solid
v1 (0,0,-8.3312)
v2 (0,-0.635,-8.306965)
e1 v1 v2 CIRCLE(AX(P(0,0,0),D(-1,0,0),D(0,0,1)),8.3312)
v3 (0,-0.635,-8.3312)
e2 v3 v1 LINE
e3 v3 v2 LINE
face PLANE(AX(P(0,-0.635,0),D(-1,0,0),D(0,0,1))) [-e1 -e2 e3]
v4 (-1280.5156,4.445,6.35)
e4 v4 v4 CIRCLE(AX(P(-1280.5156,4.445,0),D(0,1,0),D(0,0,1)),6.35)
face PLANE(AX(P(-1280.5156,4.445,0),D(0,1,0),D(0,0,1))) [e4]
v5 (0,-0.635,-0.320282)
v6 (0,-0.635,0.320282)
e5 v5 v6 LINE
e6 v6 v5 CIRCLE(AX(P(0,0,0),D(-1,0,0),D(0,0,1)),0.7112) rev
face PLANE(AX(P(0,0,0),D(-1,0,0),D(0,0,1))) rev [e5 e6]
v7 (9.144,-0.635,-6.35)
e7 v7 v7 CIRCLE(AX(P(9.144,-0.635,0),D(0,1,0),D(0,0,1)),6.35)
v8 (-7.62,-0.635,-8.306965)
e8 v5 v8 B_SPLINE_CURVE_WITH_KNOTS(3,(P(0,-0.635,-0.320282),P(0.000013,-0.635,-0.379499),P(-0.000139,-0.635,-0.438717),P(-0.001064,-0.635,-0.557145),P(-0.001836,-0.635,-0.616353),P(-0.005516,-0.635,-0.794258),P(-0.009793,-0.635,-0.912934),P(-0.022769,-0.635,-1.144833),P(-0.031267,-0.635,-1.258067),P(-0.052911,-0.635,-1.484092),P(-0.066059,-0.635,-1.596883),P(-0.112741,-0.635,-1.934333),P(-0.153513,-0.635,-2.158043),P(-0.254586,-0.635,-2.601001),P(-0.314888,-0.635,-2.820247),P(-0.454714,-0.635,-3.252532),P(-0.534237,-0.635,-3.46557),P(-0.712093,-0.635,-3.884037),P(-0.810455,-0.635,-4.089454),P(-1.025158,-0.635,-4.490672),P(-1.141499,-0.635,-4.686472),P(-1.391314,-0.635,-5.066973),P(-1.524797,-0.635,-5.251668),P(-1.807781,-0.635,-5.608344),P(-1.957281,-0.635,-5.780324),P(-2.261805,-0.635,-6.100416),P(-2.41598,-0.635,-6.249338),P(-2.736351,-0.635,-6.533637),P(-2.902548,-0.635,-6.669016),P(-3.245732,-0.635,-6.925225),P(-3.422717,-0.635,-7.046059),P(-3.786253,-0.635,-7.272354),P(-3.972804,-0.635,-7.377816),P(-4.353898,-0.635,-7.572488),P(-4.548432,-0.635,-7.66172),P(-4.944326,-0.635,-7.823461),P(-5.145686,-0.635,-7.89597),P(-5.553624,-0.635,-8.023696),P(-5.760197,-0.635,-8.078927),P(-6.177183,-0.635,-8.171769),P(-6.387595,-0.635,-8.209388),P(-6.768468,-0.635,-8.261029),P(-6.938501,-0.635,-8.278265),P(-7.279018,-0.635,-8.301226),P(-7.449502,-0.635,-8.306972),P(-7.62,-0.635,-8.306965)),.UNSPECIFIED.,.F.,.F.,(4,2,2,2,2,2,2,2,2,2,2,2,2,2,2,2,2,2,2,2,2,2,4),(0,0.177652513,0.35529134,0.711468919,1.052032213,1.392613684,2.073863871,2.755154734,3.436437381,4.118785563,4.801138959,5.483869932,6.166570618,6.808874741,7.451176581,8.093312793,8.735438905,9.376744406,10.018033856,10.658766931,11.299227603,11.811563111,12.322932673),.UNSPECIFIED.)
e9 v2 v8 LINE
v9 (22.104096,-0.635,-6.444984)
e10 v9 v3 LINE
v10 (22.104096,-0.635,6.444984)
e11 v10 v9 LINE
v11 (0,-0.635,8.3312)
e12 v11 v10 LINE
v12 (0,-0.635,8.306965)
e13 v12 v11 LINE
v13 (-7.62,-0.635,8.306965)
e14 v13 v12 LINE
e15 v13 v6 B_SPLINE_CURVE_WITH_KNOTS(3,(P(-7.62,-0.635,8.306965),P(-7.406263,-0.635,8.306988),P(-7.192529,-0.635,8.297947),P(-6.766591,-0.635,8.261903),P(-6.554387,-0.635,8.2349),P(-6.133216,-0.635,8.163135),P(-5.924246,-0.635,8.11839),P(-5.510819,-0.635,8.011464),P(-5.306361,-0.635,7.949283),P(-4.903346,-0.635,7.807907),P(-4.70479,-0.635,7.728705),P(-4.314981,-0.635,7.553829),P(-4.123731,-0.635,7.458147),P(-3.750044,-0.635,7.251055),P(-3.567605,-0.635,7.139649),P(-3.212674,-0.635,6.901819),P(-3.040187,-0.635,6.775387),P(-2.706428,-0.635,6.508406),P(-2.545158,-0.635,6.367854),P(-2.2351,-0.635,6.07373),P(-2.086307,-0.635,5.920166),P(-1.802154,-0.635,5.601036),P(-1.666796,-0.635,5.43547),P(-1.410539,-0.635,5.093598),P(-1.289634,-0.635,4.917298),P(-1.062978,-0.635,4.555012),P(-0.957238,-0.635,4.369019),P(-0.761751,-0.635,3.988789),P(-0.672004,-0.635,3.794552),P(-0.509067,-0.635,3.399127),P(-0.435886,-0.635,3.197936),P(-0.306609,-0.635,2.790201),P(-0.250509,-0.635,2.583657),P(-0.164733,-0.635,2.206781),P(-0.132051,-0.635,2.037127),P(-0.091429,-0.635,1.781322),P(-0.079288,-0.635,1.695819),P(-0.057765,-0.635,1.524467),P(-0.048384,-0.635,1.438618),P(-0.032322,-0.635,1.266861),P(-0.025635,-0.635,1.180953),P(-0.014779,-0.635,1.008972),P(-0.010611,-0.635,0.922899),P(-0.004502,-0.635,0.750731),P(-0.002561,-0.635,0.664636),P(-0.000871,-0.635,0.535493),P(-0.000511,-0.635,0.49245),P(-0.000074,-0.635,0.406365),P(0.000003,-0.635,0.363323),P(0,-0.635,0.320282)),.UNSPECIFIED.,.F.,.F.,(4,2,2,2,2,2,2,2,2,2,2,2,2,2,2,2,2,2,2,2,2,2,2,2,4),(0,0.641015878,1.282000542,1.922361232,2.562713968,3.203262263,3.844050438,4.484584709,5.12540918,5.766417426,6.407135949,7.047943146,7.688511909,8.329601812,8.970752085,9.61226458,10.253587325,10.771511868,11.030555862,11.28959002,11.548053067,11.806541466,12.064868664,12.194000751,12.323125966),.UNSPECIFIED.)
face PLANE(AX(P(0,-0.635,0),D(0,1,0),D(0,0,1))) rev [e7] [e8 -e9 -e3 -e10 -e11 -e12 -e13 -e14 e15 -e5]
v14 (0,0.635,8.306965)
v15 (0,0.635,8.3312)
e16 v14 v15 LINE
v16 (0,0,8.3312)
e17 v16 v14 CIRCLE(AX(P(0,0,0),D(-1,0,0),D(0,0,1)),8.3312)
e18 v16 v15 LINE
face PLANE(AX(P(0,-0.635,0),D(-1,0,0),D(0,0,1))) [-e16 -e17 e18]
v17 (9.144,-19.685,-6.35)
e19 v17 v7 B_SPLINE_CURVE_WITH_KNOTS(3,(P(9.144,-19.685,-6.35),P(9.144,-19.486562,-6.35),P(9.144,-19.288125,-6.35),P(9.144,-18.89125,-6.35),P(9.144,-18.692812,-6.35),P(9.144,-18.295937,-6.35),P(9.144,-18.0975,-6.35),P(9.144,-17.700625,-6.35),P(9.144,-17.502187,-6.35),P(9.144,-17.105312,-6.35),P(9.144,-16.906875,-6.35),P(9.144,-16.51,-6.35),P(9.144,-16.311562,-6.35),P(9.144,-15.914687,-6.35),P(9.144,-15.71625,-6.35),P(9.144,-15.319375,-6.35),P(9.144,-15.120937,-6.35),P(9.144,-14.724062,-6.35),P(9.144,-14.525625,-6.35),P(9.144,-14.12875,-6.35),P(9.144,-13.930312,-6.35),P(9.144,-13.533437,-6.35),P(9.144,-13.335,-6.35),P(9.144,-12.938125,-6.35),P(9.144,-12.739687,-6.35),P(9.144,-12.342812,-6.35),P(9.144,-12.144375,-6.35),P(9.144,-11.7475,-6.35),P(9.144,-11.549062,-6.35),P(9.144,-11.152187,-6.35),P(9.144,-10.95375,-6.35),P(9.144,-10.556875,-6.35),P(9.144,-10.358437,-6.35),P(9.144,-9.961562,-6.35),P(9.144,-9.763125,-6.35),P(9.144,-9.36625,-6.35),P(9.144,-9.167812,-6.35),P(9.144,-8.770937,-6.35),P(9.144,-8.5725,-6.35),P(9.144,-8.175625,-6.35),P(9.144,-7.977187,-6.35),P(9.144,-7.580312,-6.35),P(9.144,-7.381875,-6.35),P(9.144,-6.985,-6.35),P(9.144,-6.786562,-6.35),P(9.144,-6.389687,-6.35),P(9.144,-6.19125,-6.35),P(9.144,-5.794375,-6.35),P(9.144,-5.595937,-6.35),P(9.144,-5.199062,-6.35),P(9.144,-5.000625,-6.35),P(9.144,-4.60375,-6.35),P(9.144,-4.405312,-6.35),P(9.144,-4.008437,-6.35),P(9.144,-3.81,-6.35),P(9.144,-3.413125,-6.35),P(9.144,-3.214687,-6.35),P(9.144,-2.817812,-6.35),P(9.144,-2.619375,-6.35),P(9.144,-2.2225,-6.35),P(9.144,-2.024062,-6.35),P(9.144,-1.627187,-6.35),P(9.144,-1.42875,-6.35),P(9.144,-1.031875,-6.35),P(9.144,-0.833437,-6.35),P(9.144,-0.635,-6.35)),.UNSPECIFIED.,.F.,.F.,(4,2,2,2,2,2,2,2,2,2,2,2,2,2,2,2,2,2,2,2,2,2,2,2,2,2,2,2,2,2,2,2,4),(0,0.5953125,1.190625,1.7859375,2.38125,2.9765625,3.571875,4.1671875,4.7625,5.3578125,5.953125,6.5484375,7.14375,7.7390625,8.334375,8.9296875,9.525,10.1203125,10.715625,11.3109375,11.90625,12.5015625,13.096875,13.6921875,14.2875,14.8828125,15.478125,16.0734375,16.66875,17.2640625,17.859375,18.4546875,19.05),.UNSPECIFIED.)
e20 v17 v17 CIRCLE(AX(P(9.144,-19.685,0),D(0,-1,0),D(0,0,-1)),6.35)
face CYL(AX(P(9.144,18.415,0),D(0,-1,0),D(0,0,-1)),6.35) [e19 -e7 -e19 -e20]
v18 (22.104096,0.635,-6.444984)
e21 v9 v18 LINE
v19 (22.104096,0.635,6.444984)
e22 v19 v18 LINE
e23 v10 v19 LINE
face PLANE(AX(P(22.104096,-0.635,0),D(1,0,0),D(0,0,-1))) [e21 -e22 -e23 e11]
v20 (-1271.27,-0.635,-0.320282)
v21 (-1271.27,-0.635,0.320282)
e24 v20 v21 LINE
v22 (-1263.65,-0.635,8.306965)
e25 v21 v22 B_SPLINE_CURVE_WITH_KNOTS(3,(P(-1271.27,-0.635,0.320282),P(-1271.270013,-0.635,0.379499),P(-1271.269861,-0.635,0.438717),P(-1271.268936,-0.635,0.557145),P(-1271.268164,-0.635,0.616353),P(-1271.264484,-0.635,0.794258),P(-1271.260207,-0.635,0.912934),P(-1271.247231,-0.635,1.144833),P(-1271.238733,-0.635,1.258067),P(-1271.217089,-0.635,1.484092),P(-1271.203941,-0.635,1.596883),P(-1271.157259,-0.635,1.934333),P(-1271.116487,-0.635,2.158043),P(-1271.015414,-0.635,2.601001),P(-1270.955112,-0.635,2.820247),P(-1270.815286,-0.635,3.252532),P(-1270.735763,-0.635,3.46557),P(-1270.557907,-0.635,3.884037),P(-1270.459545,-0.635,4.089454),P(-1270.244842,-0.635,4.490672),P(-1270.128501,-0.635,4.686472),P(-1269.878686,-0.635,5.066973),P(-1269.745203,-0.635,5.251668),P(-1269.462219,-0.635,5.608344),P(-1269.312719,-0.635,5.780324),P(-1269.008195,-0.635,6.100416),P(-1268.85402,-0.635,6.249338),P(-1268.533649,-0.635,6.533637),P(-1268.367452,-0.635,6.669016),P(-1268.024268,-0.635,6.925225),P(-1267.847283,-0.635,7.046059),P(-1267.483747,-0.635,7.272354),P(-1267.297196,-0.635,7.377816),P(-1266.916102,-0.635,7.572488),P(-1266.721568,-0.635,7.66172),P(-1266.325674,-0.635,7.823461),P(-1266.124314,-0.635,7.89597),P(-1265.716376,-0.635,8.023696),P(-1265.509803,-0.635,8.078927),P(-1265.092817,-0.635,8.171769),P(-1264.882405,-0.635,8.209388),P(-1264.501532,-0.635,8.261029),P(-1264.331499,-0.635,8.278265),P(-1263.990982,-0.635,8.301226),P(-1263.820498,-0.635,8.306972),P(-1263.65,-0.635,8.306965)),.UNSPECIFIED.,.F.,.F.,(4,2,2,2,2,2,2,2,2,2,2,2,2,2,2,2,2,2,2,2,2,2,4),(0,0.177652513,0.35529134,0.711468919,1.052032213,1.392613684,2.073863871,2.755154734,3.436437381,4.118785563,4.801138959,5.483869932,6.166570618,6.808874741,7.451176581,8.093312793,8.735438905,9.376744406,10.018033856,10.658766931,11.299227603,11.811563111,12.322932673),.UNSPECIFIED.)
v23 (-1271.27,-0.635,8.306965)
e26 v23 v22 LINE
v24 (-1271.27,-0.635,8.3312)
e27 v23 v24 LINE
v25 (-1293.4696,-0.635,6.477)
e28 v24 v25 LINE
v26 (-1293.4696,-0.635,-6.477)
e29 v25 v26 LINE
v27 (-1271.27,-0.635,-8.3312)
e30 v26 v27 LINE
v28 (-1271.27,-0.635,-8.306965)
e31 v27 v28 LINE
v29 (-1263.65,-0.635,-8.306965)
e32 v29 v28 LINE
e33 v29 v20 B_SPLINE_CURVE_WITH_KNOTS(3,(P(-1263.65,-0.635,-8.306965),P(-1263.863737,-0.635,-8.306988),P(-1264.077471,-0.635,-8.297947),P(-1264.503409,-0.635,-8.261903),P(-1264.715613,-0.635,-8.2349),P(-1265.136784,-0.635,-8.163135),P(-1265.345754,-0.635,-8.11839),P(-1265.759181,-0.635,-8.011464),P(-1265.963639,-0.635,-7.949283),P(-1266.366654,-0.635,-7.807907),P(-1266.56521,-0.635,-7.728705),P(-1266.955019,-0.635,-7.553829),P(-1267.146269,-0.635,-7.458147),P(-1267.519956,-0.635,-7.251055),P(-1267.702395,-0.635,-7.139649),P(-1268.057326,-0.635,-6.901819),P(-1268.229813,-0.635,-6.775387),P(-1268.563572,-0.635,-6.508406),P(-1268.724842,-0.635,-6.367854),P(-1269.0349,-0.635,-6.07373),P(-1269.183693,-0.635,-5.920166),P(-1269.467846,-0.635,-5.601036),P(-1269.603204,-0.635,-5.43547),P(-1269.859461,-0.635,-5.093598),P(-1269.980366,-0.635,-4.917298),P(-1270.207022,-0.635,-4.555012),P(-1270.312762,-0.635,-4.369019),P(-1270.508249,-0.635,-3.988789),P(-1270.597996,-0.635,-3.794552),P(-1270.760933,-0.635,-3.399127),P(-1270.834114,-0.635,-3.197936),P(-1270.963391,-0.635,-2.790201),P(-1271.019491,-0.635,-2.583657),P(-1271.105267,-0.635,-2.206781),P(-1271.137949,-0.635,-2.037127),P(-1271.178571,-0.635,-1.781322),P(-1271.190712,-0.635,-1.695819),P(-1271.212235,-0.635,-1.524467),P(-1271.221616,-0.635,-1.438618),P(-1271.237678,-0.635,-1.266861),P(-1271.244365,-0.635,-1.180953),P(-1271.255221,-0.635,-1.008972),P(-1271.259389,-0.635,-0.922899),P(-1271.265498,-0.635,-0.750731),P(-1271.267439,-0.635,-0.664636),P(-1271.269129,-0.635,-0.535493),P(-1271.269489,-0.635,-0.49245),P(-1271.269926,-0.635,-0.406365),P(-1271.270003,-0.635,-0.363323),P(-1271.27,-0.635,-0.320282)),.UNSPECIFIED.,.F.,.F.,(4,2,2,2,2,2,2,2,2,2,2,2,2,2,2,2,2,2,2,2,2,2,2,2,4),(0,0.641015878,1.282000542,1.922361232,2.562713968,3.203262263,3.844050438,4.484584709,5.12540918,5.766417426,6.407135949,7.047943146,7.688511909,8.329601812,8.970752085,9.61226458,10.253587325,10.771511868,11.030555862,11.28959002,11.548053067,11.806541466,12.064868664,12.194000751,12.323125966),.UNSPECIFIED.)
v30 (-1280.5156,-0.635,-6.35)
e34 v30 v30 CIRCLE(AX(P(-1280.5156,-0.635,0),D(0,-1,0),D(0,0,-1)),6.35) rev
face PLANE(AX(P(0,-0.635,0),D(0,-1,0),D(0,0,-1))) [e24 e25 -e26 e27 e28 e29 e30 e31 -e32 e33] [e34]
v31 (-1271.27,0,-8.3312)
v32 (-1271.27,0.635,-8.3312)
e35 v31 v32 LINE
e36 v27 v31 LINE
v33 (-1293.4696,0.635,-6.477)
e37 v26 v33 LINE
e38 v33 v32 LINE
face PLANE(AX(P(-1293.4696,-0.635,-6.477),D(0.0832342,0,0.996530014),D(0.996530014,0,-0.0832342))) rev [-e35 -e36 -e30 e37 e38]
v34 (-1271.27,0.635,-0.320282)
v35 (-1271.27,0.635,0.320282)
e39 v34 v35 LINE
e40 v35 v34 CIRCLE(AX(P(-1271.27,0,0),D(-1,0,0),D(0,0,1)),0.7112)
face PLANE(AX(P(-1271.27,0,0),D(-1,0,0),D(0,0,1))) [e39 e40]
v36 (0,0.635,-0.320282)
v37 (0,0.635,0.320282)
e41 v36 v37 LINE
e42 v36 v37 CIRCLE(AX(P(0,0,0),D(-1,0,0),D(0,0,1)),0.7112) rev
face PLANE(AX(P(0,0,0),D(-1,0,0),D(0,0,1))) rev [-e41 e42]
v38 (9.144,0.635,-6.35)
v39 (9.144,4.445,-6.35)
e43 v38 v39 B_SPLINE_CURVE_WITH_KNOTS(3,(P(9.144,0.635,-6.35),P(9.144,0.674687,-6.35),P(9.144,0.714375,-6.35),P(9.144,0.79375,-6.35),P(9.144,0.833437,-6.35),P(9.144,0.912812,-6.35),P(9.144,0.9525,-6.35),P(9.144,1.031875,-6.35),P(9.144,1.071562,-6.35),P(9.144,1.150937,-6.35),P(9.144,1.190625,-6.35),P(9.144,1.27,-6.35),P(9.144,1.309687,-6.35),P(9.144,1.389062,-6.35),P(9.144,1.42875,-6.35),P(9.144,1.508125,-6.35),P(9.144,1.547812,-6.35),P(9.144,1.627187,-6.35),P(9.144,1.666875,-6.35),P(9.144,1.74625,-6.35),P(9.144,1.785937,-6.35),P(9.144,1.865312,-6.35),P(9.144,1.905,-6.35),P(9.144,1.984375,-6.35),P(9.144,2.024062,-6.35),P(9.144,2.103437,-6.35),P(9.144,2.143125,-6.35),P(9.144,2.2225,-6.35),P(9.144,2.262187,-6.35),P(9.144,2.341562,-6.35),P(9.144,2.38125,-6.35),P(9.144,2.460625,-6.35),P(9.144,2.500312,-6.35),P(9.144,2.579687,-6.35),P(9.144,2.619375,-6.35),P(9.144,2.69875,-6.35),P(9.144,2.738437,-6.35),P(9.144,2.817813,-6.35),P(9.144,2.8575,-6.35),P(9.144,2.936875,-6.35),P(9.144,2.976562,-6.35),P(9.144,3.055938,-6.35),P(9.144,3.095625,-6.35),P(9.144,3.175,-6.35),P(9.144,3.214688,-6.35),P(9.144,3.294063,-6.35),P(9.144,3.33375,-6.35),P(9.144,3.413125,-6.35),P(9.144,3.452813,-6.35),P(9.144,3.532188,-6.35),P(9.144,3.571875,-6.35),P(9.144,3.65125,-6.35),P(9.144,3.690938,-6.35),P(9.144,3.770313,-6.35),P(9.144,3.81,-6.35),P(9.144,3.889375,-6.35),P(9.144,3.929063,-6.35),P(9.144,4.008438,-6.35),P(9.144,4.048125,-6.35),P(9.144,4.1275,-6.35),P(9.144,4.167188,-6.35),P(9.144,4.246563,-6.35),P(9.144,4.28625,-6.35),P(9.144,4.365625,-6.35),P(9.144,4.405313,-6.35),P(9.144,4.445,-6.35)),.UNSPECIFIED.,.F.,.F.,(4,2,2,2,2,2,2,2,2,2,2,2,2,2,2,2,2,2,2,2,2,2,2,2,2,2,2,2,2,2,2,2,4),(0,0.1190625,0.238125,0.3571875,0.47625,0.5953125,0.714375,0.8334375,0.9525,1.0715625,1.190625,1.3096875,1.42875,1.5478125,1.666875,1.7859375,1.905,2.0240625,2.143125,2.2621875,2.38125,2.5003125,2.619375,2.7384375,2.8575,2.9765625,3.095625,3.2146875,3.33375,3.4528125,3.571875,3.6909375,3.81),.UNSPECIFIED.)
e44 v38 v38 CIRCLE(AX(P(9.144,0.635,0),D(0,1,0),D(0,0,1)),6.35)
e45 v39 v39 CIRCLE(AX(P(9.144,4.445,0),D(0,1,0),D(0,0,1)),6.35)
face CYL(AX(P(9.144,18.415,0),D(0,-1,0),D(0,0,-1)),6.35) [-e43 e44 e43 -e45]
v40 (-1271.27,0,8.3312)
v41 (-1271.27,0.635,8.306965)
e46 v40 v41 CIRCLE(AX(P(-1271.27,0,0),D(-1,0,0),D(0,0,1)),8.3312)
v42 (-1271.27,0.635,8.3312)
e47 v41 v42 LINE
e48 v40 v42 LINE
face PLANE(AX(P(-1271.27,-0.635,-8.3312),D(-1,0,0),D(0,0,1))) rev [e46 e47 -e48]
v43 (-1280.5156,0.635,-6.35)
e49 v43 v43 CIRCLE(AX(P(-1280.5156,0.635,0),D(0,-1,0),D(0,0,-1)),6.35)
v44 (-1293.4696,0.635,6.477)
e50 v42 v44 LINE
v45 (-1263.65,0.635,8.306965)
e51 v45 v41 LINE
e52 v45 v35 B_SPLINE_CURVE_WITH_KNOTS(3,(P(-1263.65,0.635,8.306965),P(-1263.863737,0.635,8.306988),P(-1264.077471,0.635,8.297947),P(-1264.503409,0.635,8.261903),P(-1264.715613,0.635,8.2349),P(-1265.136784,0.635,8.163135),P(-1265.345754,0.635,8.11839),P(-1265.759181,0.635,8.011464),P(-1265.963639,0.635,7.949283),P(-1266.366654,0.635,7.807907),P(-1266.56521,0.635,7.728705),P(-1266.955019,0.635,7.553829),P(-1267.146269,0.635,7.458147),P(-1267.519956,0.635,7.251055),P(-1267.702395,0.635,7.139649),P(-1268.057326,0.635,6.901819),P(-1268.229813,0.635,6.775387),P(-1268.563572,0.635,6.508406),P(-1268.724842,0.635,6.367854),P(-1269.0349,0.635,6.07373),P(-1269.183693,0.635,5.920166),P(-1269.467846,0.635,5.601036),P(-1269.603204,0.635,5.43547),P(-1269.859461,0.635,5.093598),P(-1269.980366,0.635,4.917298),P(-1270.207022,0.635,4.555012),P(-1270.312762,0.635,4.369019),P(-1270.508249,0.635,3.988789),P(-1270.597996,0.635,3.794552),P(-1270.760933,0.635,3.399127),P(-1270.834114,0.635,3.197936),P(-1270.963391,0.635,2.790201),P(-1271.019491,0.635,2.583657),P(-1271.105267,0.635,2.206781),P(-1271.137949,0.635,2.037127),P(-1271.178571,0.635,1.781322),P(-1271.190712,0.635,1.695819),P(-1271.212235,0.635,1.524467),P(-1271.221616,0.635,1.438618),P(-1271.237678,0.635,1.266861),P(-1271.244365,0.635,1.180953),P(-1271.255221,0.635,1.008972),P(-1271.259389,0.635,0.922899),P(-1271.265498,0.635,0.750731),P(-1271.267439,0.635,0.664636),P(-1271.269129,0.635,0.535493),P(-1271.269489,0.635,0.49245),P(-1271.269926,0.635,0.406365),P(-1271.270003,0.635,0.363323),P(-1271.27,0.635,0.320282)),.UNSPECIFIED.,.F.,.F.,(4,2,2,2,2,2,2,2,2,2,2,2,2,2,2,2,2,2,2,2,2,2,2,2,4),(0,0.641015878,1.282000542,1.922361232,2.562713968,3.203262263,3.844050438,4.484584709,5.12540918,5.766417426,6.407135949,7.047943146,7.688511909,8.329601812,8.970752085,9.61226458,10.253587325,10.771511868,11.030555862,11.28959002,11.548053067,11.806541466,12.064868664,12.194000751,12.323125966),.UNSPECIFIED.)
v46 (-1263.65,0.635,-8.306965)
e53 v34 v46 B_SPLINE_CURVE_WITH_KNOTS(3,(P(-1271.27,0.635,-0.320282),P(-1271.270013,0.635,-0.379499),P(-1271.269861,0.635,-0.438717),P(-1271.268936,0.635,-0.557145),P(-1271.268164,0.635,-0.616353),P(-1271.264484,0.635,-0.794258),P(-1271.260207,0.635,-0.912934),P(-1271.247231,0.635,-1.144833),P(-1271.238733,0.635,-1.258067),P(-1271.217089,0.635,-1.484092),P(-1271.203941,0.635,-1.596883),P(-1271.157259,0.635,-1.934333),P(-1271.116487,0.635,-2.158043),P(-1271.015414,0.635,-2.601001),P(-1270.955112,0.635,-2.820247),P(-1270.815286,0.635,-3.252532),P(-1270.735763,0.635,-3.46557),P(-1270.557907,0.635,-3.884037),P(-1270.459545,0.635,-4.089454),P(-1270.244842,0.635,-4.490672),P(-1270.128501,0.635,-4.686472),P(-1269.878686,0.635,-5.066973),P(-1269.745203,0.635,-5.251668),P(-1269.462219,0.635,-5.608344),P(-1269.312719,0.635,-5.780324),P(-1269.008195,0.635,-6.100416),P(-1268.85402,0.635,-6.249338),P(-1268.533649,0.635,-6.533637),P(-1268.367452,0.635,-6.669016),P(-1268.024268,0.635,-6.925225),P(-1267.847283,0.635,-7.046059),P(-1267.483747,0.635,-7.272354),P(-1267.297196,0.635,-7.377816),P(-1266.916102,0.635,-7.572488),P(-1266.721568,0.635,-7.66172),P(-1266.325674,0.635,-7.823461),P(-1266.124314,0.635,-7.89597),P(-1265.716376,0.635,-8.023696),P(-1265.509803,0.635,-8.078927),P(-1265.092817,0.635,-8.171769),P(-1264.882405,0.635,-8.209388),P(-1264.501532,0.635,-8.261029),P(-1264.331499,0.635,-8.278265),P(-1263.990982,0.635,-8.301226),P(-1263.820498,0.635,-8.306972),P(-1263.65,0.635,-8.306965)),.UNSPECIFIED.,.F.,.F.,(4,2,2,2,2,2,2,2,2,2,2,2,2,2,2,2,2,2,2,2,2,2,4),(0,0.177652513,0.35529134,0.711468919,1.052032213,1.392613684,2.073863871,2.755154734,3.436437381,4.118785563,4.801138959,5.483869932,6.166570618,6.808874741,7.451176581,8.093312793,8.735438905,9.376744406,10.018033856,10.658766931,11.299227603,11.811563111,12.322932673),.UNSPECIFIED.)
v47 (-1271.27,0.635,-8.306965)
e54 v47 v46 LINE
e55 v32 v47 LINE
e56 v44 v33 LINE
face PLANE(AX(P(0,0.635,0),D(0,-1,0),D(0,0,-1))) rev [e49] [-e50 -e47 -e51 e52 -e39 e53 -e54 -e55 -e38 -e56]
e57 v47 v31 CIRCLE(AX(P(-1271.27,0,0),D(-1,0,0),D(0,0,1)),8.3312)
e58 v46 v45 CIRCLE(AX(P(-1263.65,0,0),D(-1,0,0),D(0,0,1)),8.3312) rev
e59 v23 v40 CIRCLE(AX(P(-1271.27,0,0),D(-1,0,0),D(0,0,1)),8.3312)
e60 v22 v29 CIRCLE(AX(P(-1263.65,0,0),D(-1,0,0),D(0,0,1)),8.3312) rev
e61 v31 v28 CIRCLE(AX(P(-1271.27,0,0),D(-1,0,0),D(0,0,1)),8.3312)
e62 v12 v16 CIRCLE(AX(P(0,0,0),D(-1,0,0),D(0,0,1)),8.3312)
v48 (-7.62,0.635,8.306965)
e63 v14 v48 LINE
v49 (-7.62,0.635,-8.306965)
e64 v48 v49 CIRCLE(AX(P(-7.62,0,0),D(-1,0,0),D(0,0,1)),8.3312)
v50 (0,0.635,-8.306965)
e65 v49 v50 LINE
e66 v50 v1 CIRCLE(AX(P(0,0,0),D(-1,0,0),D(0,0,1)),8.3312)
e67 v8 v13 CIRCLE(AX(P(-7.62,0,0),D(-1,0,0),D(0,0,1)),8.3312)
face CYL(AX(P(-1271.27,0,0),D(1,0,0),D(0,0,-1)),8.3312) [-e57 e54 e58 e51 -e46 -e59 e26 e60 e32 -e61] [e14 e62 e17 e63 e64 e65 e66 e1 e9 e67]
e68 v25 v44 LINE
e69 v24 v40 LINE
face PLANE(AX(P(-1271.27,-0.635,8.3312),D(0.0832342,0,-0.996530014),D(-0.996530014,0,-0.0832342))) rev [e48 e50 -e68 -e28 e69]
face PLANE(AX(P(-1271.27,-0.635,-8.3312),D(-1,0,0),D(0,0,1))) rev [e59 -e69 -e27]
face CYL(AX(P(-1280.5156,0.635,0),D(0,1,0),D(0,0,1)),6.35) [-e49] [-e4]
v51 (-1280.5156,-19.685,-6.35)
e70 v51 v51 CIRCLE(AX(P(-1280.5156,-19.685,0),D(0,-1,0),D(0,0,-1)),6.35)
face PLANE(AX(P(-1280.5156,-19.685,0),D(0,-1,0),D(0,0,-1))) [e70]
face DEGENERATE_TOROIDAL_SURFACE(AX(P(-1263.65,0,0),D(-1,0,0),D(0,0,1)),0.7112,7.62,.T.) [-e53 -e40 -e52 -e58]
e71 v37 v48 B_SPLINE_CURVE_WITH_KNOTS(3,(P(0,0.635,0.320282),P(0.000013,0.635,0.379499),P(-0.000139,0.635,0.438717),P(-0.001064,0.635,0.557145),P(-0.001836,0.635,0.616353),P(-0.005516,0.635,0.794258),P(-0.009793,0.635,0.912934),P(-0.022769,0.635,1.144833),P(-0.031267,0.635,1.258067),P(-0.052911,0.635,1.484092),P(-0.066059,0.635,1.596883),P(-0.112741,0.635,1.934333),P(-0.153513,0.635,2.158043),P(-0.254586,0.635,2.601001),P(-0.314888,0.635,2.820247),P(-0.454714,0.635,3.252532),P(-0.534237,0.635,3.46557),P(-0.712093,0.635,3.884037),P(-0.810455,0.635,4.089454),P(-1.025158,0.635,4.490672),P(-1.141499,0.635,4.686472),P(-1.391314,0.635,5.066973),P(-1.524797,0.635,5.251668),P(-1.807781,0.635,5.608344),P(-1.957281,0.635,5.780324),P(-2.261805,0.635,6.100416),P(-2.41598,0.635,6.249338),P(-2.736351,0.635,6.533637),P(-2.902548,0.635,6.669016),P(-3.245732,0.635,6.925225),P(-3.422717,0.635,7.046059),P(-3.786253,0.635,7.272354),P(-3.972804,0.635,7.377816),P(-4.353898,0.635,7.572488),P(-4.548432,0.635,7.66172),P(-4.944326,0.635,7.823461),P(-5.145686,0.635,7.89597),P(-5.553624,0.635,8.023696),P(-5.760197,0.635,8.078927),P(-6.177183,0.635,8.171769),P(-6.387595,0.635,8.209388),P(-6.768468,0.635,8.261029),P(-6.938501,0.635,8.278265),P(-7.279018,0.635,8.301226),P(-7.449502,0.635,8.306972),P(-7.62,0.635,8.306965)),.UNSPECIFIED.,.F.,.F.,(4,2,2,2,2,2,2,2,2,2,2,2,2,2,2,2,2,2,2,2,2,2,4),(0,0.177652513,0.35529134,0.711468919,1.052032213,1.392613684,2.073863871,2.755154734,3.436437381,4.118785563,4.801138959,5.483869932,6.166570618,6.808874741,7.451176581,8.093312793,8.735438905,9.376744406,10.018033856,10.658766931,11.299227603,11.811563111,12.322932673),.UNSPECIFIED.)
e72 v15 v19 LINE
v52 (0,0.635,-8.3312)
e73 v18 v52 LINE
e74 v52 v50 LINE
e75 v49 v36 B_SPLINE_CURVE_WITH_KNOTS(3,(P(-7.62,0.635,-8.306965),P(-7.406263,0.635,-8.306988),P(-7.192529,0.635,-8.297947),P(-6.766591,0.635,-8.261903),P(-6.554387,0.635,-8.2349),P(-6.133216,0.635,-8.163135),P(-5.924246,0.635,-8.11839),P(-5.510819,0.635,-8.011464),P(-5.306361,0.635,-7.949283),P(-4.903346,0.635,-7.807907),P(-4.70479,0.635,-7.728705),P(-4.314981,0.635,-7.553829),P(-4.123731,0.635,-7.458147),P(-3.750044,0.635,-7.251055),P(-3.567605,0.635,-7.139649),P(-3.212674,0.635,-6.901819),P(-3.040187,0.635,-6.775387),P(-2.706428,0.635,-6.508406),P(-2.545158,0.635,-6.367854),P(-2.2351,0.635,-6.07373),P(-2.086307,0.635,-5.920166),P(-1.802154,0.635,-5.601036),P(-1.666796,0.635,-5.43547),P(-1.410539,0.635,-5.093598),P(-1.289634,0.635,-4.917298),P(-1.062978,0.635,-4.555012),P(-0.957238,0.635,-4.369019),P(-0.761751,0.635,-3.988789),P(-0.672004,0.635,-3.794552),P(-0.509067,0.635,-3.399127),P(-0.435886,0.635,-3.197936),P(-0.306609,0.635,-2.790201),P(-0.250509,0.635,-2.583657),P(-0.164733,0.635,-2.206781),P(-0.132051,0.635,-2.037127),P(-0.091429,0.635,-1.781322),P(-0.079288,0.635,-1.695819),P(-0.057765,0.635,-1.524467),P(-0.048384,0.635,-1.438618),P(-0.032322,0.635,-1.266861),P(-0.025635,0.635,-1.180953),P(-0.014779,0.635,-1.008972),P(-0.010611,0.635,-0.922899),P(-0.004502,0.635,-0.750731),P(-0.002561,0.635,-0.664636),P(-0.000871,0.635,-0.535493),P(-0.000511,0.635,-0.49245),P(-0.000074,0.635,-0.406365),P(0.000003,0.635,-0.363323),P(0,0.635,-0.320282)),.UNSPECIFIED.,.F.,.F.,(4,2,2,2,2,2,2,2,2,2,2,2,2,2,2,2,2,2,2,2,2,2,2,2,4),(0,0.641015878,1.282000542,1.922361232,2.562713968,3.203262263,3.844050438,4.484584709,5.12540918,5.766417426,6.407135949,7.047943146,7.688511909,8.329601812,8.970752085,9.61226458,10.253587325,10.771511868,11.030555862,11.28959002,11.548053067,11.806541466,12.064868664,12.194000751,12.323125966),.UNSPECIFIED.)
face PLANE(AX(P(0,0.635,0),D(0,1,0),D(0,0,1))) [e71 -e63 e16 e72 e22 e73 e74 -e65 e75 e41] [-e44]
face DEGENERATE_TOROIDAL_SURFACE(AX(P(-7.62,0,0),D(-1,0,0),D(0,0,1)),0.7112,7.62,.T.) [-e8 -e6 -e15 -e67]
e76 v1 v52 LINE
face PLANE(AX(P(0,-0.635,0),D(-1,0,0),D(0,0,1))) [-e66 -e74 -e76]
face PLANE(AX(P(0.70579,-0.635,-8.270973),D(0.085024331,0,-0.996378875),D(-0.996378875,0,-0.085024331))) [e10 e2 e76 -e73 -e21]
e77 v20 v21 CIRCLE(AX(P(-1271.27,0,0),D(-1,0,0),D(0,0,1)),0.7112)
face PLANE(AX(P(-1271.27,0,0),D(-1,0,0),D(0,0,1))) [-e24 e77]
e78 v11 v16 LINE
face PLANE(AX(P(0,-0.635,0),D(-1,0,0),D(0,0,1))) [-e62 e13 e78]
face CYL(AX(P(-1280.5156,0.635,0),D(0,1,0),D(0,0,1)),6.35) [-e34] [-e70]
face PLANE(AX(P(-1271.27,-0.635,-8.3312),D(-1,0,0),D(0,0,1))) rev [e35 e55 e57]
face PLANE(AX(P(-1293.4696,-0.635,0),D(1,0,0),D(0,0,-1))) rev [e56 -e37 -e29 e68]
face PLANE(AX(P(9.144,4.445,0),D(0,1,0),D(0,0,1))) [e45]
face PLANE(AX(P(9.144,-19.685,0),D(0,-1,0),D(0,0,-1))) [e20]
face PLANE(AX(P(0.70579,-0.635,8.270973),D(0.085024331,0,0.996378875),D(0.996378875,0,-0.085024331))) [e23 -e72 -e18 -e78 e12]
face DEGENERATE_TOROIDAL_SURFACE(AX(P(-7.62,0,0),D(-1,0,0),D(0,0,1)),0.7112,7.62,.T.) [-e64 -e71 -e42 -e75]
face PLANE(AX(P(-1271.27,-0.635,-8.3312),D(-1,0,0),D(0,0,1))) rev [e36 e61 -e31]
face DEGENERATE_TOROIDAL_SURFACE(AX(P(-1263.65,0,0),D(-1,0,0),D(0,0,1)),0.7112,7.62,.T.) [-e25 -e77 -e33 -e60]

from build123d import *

# Parameters (mm, degrees)
EXTRUSION1_DEPTH      = 0.635
EXTRUSION1_DEPTH_BACK = 0.635
SKETCH1_R             = 6.35
EXTRUSION2_DEPTH      = 19.05
EXTRUSION2_DEPTH_BACK = 19.05
SKETCH2_R             = 6.35
SKETCH3_R             = 6.35
EXTRUSION3_DEPTH      = 13.97
SKETCH4_R             = 6.35
EXTRUSION4_DEPTH      = 3.81
SKETCH5_R             = 8.3312
EXTRUSION5_DEPTH      = 1271.27
SKETCH6_R             = 6.35
EXTRUSION6_DEPTH      = 1.27
SKETCH7_R             = 6.35
EXTRUSION7_DEPTH      = 20.32
FILLET1_R             = 7.62


with BuildPart() as part:
    # Sketch1 → Extrusion1 (new, two sides: drawn at the far end of the back side and taken through both)
    with BuildSketch(Plane(origin=(0, 0, 0), x_dir=(-1, 0, 0), z_dir=(0, 1, 0)).offset(-EXTRUSION1_DEPTH_BACK)):
        Polygon((-22.104096049, 6.444983804), (-22.104096049, -6.444983804), (0, -8.3312), (0, 8.3312), align=None)
        with Locations(Location((-9.144, 0, 0), (0, 0, 90))):
            Circle(SKETCH1_R, mode=Mode.SUBTRACT)
    extrude(amount=EXTRUSION1_DEPTH + EXTRUSION1_DEPTH_BACK)

    # Sketch2 → Extrusion2 (add, two sides: drawn at the far end of the back side and taken through both)
    with BuildSketch(Plane.XZ.offset(0.635).offset(-EXTRUSION2_DEPTH_BACK)):
        with Locations(Location((9.144, 0, 0), (0, 0, 270))):
            Circle(SKETCH2_R)
    extrude(amount=EXTRUSION2_DEPTH + EXTRUSION2_DEPTH_BACK)

    # Sketch3 → Extrusion3 (cut)
    with BuildSketch(Plane(origin=(0, 18.415, 0), x_dir=(-1, 0, 0), z_dir=(0, 1, 0))):
        with Locations(Location((-9.144, 0, 0), (0, 0, 270))):
            Circle(SKETCH3_R)
    extrude(amount=-EXTRUSION3_DEPTH, mode=Mode.SUBTRACT)

    # Sketch5 → Extrusion5 (add)
    with BuildSketch(Plane.ZY):
        Circle(SKETCH5_R)
    extrude(amount=EXTRUSION5_DEPTH)

    # Sketch6 → Extrusion6 (add)
    with BuildSketch(Plane.XZ.offset(-0.635)):
        Polygon((-1293.4696, 0), (-1293.4696, -6.477), (-1271.27, -8.3312), (-1271.27, 8.3312), (-1293.4696, 6.477), align=None)
        with Locations(Location((-1280.5156, 0, 0), (0, 0, 90))):
            Circle(SKETCH6_R, mode=Mode.SUBTRACT)
    extrude(amount=EXTRUSION6_DEPTH)



with BuildPart() as body_2:
    # Sketch4 → Extrusion4 (new body)
    with BuildSketch(Plane(origin=(0, 4.445, 0), x_dir=(-1, 0, 0), z_dir=(0, 1, 0))):
        with Locations(Location((1280.5156, 0, 0), (0, 0, 90))):
            Circle(SKETCH4_R)
    extrude(amount=-EXTRUSION4_DEPTH)


with BuildPart() as part_1:
    add(part.part)

    add(body_2.part)  # Extrusion7 merges body 2
    # Sketch7 → Extrusion7 (add)
    with BuildSketch(Plane.XZ.offset(-0.635)):
        with Locations(Location((-1280.5156, 0, 0), (0, 0, 270))):
            Circle(SKETCH7_R)
    extrude(amount=EXTRUSION7_DEPTH)

    # Fillet1
    # the kernel refuses this fillet: 7.62 mm, written as the material it takes off along each edge
    with BuildSketch(Plane(origin=(-1271.27, 0, 0), x_dir=(0, -0.9999950652018581, 0.003141587485873656), z_dir=(0, -0.003141587485873656, -0.9999950652018581))) as fillet1_piece_1_section:
        with BuildLine():
            CenterArc((8.3312 - FILLET1_R, -FILLET1_R), FILLET1_R, 0, 90)
            Line((8.3312 - FILLET1_R, 0), (8.3312, 0))
            Line((8.3312, 0), (8.3312, -FILLET1_R))
        make_face()
    fillet1_piece_1 = revolve(axis=Axis((-1271.27, 0, 0), (-1, 0, 0)), revolution_arc=359.64, mode=Mode.PRIVATE)
    fillet1_piece_1 = split(fillet1_piece_1, bisect_by=Plane(origin=(-1269.374883086, -0.635, 4.28224122), z_dir=(0, -1, 0)), keep=Keep.TOP, mode=Mode.PRIVATE)
    add(fillet1_piece_1, mode=Mode.SUBTRACT)
    with BuildSketch(Plane(origin=(-1271.27, 0, 0), x_dir=(0, -0.9999950652018581, 0.003141587485873656), z_dir=(0, -0.003141587485873656, -0.9999950652018581))) as fillet1_piece_2_section:
        with BuildLine():
            CenterArc((8.3312 - FILLET1_R, -FILLET1_R), FILLET1_R, 0, 90)
            Line((8.3312 - FILLET1_R, 0), (8.3312, 0))
            Line((8.3312, 0), (8.3312, -FILLET1_R))
        make_face()
    fillet1_piece_2 = revolve(axis=Axis((-1271.27, 0, 0), (-1, 0, 0)), revolution_arc=359.64, mode=Mode.PRIVATE)
    fillet1_piece_2 = split(fillet1_piece_2, bisect_by=Plane(origin=(-1269.082318262, 0.635, 0), z_dir=(0, 1, 0)), keep=Keep.TOP, mode=Mode.PRIVATE)
    add(fillet1_piece_2, mode=Mode.SUBTRACT)
    with BuildSketch(Plane(origin=(0, 0, 0), x_dir=(0, -0.9999950652018581, 0.003141587485874322), z_dir=(0, -0.003141587485874322, -0.9999950652018581))) as fillet1_piece_3_section:
        with BuildLine():
            CenterArc((8.3312 - FILLET1_R, FILLET1_R), FILLET1_R, 270, 90)
            Line((8.3312, FILLET1_R), (8.3312, 0))
            Line((8.3312, 0), (8.3312 - FILLET1_R, 0))
        make_face()
    fillet1_piece_3 = revolve(axis=Axis((0, 0, 0), (-1, 0, 0)), revolution_arc=359.64, mode=Mode.PRIVATE)
    fillet1_piece_3 = split(fillet1_piece_3, bisect_by=Plane(origin=(-1.895117191, -0.635, 4.282241186), z_dir=(0, -1, 0)), keep=Keep.TOP, mode=Mode.PRIVATE)
    add(fillet1_piece_3, mode=Mode.SUBTRACT)
    with BuildSketch(Plane(origin=(0, 0, 0), x_dir=(0, -0.9999950652018581, 0.003141587485874322), z_dir=(0, -0.003141587485874322, -0.9999950652018581))) as fillet1_piece_4_section:
        with BuildLine():
            CenterArc((8.3312 - FILLET1_R, FILLET1_R), FILLET1_R, 270, 90)
            Line((8.3312, FILLET1_R), (8.3312, 0))
            Line((8.3312, 0), (8.3312 - FILLET1_R, 0))
        make_face()
    fillet1_piece_4 = revolve(axis=Axis((0, 0, 0), (-1, 0, 0)), revolution_arc=359.64, mode=Mode.PRIVATE)
    fillet1_piece_4 = split(fillet1_piece_4, bisect_by=Plane(origin=(-2.187681733, 0.635, 0), z_dir=(0, 1, 0)), keep=Keep.TOP, mode=Mode.PRIVATE)
    add(fillet1_piece_4, mode=Mode.SUBTRACT)
    with BuildSketch(Plane(origin=(0, 0, 0), x_dir=(0, 0.9999950652018581, -0.00314158748588508), z_dir=(0, 0.00314158748588508, 0.9999950652018581))) as fillet1_piece_5_section:
        with BuildLine():
            CenterArc((8.3312 - FILLET1_R, FILLET1_R), FILLET1_R, 270, 90)
            Line((8.3312, FILLET1_R), (8.3312, 0))
            Line((8.3312, 0), (8.3312 - FILLET1_R, 0))
        make_face()
    fillet1_piece_5 = revolve(axis=Axis((0, 0, 0), (-1, 0, 0)), revolution_arc=359.64, mode=Mode.PRIVATE)
    fillet1_piece_5 = split(fillet1_piece_5, bisect_by=Plane(origin=(-1.895117191, 0.635, -4.282241186), z_dir=(0, 1, 0)), keep=Keep.TOP, mode=Mode.PRIVATE)
    add(fillet1_piece_5, mode=Mode.SUBTRACT)
    with BuildSketch(Plane(origin=(0, 0, 0), x_dir=(0, 0.9999950652018581, -0.00314158748588508), z_dir=(0, 0.00314158748588508, 0.9999950652018581))) as fillet1_piece_6_section:
        with BuildLine():
            CenterArc((8.3312 - FILLET1_R, FILLET1_R), FILLET1_R, 270, 90)
            Line((8.3312, FILLET1_R), (8.3312, 0))
            Line((8.3312, 0), (8.3312 - FILLET1_R, 0))
        make_face()
    fillet1_piece_6 = revolve(axis=Axis((0, 0, 0), (-1, 0, 0)), revolution_arc=359.64, mode=Mode.PRIVATE)
    fillet1_piece_6 = split(fillet1_piece_6, bisect_by=Plane(origin=(-2.187681733, -0.635, 0), z_dir=(0, -1, 0)), keep=Keep.TOP, mode=Mode.PRIVATE)
    add(fillet1_piece_6, mode=Mode.SUBTRACT)
    with BuildSketch(Plane(origin=(-1271.27, 0, 0), x_dir=(0, 0.9999950652018581, -0.003141587485884858), z_dir=(0, 0.003141587485884858, 0.9999950652018581))) as fillet1_piece_7_section:
        with BuildLine():
            CenterArc((8.3312 - FILLET1_R, -FILLET1_R), FILLET1_R, 0, 90)
            Line((8.3312 - FILLET1_R, 0), (8.3312, 0))
            Line((8.3312, 0), (8.3312, -FILLET1_R))
        make_face()
    fillet1_piece_7 = revolve(axis=Axis((-1271.27, 0, 0), (-1, 0, 0)), revolution_arc=359.64, mode=Mode.PRIVATE)
    fillet1_piece_7 = split(fillet1_piece_7, bisect_by=Plane(origin=(-1269.374883188, 0.635, -4.282241233), z_dir=(0, 1, 0)), keep=Keep.TOP, mode=Mode.PRIVATE)
    add(fillet1_piece_7, mode=Mode.SUBTRACT)
    with BuildSketch(Plane(origin=(-1271.27, 0, 0), x_dir=(0, 0.9999950652018581, -0.003141587485884858), z_dir=(0, 0.003141587485884858, 0.9999950652018581))) as fillet1_piece_8_section:
        with BuildLine():
            CenterArc((8.3312 - FILLET1_R, -FILLET1_R), FILLET1_R, 0, 90)
            Line((8.3312 - FILLET1_R, 0), (8.3312, 0))
            Line((8.3312, 0), (8.3312, -FILLET1_R))
        make_face()
    fillet1_piece_8 = revolve(axis=Axis((-1271.27, 0, 0), (-1, 0, 0)), revolution_arc=359.64, mode=Mode.PRIVATE)
    fillet1_piece_8 = split(fillet1_piece_8, bisect_by=Plane(origin=(-1269.082318263, -0.635, 0), z_dir=(0, -1, 0)), keep=Keep.TOP, mode=Mode.PRIVATE)
    add(fillet1_piece_8, mode=Mode.SUBTRACT)


solid = part_1.part
